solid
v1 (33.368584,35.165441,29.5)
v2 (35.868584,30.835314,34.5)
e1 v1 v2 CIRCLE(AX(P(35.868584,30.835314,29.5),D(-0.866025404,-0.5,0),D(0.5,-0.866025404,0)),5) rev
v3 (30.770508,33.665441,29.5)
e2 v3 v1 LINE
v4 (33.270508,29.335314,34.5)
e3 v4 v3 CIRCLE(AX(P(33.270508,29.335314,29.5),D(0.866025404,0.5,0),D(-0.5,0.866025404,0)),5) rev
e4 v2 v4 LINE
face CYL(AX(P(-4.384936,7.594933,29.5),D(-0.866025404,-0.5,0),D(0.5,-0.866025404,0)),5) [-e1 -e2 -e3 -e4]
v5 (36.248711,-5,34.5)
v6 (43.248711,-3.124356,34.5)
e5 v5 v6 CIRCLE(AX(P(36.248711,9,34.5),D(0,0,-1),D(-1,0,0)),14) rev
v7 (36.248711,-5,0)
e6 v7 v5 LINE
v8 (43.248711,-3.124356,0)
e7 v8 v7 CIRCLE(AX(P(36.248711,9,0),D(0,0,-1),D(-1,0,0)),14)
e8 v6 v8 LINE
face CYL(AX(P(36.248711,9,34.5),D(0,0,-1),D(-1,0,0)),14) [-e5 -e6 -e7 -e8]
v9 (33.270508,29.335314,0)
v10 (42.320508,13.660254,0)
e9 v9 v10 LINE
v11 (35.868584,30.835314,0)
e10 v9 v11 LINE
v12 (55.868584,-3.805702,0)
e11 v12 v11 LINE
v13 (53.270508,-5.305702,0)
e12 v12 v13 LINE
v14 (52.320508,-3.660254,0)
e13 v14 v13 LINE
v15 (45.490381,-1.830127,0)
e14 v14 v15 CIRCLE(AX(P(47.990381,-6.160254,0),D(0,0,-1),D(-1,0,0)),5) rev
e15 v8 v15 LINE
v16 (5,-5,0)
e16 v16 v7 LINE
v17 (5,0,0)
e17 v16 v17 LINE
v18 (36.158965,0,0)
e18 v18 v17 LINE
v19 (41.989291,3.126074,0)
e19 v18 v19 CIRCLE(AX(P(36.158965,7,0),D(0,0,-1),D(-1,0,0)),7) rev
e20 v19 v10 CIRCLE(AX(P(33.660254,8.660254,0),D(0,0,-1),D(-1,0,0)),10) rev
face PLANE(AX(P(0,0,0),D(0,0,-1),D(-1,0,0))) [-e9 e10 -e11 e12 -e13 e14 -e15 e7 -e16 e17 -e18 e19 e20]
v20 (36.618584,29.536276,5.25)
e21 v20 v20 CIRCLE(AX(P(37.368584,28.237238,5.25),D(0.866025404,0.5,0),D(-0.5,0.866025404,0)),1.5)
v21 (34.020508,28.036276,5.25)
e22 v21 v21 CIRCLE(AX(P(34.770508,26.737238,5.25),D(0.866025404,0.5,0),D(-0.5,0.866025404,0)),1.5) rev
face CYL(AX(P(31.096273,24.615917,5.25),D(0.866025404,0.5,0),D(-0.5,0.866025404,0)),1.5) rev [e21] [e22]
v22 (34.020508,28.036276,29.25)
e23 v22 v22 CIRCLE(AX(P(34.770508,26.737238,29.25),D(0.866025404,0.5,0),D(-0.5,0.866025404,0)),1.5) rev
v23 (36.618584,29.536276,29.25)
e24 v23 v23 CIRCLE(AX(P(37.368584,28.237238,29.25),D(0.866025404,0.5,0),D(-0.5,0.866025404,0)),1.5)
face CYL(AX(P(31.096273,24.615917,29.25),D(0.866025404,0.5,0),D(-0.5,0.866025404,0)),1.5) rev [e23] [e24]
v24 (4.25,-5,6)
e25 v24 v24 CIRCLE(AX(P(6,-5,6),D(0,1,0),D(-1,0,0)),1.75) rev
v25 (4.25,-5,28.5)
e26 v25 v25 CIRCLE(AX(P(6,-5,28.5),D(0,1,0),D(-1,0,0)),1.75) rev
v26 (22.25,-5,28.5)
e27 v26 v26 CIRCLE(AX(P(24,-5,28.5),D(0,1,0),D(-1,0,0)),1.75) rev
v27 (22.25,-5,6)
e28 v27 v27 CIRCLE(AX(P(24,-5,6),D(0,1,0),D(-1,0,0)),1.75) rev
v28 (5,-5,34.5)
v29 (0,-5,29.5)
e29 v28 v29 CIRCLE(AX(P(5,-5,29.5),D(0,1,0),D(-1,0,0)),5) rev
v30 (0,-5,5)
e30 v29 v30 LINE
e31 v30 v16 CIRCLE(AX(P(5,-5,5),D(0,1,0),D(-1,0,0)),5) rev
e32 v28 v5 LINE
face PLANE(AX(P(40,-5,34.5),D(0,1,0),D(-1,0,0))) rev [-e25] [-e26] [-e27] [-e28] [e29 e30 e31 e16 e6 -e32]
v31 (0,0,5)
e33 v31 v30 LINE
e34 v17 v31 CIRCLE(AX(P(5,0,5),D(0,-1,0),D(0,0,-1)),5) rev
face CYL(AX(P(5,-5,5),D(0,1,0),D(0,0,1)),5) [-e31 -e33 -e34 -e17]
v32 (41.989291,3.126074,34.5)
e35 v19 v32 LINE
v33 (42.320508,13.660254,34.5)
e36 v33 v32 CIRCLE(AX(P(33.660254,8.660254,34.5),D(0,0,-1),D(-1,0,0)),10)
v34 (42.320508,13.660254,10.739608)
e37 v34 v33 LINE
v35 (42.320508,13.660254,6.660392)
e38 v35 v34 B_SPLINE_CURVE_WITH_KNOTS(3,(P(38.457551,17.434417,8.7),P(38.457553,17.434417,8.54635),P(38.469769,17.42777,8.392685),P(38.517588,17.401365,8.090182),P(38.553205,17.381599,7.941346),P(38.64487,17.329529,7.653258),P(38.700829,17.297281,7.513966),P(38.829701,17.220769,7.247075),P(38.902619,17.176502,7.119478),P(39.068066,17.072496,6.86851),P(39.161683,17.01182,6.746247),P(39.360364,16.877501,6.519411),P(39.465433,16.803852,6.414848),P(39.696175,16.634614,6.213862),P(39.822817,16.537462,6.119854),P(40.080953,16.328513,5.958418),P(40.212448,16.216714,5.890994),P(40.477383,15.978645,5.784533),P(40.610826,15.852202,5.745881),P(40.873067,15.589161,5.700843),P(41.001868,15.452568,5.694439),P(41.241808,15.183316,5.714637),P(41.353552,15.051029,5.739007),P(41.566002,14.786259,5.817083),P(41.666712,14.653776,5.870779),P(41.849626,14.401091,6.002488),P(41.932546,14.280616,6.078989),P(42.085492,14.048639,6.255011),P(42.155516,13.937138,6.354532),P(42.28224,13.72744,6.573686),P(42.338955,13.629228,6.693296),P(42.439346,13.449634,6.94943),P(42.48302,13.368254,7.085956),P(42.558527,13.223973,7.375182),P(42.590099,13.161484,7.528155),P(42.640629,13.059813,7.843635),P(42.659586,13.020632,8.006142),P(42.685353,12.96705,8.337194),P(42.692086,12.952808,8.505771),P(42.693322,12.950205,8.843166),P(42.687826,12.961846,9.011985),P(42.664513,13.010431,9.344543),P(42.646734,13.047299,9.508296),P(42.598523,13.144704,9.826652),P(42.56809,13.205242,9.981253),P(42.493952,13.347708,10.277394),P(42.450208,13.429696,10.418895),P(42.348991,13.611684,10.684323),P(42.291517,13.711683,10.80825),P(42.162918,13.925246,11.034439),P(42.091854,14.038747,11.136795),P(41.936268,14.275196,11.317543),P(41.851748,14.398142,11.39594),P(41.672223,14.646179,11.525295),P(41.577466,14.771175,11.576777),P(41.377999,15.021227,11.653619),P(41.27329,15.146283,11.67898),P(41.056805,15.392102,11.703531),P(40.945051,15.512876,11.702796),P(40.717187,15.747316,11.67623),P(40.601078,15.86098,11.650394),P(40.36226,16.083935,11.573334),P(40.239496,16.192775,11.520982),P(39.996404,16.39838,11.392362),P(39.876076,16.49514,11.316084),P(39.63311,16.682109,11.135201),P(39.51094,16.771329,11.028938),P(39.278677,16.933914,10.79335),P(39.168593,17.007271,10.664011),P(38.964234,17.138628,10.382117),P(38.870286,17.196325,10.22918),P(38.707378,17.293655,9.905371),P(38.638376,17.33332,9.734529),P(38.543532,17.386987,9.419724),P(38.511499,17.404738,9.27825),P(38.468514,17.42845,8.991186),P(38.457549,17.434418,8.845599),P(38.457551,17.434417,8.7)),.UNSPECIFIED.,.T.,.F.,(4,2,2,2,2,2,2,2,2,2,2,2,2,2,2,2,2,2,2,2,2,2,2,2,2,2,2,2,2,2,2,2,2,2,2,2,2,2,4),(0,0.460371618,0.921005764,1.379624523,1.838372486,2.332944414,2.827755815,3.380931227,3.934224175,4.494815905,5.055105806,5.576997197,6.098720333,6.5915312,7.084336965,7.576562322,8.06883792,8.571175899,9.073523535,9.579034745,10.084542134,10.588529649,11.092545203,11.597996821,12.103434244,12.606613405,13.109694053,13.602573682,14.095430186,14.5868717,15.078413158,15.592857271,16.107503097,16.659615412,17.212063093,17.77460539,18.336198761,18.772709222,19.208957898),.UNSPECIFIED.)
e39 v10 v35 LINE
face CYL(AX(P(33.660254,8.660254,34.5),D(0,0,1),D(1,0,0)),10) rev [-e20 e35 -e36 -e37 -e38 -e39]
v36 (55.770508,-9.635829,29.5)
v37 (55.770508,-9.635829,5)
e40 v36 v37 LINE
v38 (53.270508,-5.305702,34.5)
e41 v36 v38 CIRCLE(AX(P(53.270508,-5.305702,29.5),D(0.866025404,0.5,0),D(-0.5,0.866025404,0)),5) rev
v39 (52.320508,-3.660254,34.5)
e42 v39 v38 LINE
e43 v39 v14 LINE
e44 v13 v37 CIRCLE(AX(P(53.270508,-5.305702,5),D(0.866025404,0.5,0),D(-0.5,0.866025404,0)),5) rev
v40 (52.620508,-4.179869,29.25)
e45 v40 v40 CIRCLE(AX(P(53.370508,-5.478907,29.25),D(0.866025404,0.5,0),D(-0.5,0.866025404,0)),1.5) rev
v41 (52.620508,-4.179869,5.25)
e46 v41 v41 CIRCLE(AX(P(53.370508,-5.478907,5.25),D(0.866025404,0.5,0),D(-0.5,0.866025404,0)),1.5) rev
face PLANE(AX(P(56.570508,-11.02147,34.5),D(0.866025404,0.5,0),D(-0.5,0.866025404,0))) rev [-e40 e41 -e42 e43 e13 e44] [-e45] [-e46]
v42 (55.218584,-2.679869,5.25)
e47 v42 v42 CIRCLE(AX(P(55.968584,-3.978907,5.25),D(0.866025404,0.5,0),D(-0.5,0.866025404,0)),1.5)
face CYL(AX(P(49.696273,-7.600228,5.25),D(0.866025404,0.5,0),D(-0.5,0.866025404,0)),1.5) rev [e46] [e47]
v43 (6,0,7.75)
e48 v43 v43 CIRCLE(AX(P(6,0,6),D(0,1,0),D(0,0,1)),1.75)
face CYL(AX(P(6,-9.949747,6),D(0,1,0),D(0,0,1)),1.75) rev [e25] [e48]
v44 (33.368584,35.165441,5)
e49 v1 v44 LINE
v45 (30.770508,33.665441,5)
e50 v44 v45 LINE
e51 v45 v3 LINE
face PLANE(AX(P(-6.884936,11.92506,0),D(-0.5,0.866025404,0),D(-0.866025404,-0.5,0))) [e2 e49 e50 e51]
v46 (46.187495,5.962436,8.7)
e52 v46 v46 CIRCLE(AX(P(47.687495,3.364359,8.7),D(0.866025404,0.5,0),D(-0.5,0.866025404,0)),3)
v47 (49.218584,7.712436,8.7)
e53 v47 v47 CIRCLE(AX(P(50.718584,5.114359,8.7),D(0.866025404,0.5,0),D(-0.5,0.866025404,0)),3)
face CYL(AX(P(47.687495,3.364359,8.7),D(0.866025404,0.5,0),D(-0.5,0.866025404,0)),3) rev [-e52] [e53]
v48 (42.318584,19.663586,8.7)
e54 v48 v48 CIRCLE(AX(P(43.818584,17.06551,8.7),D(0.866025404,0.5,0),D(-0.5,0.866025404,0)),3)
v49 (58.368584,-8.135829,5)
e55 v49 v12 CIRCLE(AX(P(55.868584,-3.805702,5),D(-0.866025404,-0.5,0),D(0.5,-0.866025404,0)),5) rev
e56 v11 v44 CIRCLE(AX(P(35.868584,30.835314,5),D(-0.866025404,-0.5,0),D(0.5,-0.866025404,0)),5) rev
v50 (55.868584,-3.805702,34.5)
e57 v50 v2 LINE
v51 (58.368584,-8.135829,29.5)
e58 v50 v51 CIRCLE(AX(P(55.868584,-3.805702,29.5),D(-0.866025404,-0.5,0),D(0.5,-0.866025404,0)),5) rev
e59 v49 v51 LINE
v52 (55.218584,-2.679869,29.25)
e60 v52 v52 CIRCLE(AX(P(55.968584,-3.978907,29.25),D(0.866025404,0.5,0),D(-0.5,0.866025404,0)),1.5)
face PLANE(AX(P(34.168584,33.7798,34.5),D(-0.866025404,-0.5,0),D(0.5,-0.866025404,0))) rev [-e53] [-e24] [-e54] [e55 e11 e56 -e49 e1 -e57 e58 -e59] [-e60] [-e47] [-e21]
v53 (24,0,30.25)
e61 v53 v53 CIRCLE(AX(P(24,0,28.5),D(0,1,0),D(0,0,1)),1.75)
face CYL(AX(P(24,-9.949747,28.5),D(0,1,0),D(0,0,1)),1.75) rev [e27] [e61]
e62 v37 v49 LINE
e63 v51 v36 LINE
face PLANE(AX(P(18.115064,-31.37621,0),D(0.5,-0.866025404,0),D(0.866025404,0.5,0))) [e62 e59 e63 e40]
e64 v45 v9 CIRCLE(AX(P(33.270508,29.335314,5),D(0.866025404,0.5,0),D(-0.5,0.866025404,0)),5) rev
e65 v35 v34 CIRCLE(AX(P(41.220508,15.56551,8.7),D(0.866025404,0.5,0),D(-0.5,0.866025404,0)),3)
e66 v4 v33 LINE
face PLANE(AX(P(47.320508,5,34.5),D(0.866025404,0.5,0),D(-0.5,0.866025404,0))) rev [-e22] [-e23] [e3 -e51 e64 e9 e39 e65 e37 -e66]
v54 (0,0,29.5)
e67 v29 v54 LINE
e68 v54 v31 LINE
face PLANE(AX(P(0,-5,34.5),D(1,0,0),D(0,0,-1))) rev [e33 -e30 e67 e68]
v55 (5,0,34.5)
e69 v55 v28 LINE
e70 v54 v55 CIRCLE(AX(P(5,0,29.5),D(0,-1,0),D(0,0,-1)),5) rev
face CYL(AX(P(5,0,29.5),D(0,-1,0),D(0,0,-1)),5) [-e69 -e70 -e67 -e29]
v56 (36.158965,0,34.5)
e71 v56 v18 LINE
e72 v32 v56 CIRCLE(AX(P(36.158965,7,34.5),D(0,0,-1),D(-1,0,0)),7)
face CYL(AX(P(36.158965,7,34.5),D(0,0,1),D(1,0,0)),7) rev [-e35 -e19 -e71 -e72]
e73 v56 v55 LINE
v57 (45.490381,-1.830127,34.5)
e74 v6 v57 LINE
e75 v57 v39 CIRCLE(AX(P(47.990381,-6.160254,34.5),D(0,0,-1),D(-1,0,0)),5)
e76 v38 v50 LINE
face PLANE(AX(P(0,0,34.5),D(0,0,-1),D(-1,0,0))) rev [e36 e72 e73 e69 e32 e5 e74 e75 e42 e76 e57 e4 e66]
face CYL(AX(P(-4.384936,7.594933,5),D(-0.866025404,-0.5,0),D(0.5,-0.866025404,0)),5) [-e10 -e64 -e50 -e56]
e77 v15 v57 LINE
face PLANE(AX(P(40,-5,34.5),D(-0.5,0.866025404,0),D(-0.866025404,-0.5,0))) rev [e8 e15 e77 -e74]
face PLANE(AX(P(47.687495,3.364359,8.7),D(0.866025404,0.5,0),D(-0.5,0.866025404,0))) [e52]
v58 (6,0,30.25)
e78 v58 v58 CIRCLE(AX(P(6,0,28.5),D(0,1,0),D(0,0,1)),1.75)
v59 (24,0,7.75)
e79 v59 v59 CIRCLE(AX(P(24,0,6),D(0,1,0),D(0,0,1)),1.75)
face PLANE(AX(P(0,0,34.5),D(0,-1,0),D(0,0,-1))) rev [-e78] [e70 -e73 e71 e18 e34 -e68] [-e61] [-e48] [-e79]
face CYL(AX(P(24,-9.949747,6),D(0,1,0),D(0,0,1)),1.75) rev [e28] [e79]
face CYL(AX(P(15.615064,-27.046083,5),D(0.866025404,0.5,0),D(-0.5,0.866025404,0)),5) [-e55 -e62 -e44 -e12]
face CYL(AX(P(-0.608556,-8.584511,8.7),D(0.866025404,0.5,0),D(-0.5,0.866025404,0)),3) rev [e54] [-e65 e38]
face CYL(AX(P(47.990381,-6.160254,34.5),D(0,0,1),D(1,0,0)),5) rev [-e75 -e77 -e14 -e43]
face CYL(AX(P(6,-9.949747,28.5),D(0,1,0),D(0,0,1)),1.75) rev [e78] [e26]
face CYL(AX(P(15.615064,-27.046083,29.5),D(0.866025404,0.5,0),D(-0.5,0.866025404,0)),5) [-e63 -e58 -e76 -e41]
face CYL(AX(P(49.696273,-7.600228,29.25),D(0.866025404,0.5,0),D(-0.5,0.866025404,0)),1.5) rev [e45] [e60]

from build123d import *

# Parameters (mm, degrees)
P_IDAT_VYSUNUT_M1_DEPTH       = 34.5
SKICA2_R                      = 1.5
ODEBRAT_VYSUNUT_M1_DEPTH      = 3
SKICA4_R                      = 1.75
ODEBRAT_VYSUNUT_M2_DEPTH      = 5
SKICA6_W                      = 3
SKICA6_H                      = 34.5
P_IDAT_VYSUNUT_M3_DEPTH       = 1.6
SKICA7_W                      = 3
SKICA7_H                      = 34.5
ODEBRAT_VYSUNUT_M3_DEPTH      = 1.6
ZAOBLIT1_R                    = 5
ZAOBLIT2_R                    = 5
ZAOBLIT3_R                    = 10
ZAOBLIT4_R                    = 5
ZAOBLIT5_R                    = 7
ZAOBLIT6_R                    = 14
ODEBRAT_VYSUNUT_M5_REACH      = 64.381
ODEBRAT_VYSUNUT_M5_END_RADIUS = 10
SKICA8_R                      = 3
SKICA9_R                      = 3
ODEBRAT_VYSUNUT_M6_DEPTH      = 3.5


with BuildPart() as part:
    # Skica1 → Přidat vysunutím1 (new body)
    with BuildSketch(Plane.XY):
        Polygon((0, 0), (38.660254038, 0), (47.320508076, 5), (31.570508076, 32.279800219), (34.168584287, 33.779800219), (59.168584287, -9.52146997), (56.570508076, -11.02146997), (49.820508076, 0.669872981), (40, -5), (0, -5), align=None)
    extrude(amount=P_IDAT_VYSUNUT_M1_DEPTH)

    # Skica2 → Odebrat vysunutím1 (cut)
    with BuildSketch(Plane(origin=(40.253520778, 23.240381057, 0), x_dir=(0, 0, -1), z_dir=(0.8660254037844362, 0.5000000000000046, 0))):
        with Locations(Location((-29.25, 5.769872981, 0), (0, 0, 90))):
            Circle(SKICA2_R)
        with Locations(Location((-29.25, -31.430127019, 0), (0, 0, 90))):
            Circle(SKICA2_R)
        with Locations(Location((-5.25, 5.769872981, 0), (0, 0, 90))):
            Circle(SKICA2_R)
        with Locations(Location((-5.25, -31.430127019, 0), (0, 0, 90))):
            Circle(SKICA2_R)
    extrude(amount=-ODEBRAT_VYSUNUT_M1_DEPTH, mode=Mode.SUBTRACT)

    # Skica4 → Odebrat vysunutím2 (cut)
    with BuildSketch(Plane(origin=(0, 0, 0), x_dir=(1, 0, 0), z_dir=(0, 1, 0))):
        with Locations(Location((6, -6, 0), (0, 0, 270))):
            Circle(SKICA4_R)
        with Locations(Location((6, -28.5, 0), (0, 0, 270))):
            Circle(SKICA4_R)
        with Locations(Location((24, -28.5, 0), (0, 0, 270))):
            Circle(SKICA4_R)
        with Locations(Location((24, -6, 0), (0, 0, 270))):
            Circle(SKICA4_R)
    extrude(amount=-ODEBRAT_VYSUNUT_M2_DEPTH, mode=Mode.SUBTRACT)

    # Skica6 → Přidat vysunutím3 (add)
    with BuildSketch(Plane(origin=(-6.084936491, 10.539419162, 0), x_dir=(0.8660254037844357, 0.5000000000000052, 0), z_dir=(-0.5000000000000052, 0.8660254037844357, 0))):
        with Locations((44.980762114, -17.25)):
            Rectangle(SKICA6_W, SKICA6_H)
    extrude(amount=P_IDAT_VYSUNUT_M3_DEPTH)

    # Skica7 → Odebrat vysunutím3 (cut)
    with BuildSketch(Plane(origin=(18.915063509, -32.761851027, 0), x_dir=(0.8660254037844368, 0.5000000000000032, 0), z_dir=(0.5000000000000032, -0.8660254037844368, 0))):
        with Locations((44.980762114, 17.25)):
            Rectangle(SKICA7_W, SKICA7_H)
    extrude(amount=-ODEBRAT_VYSUNUT_M3_DEPTH, mode=Mode.SUBTRACT)

    # Zaoblit1
    zaoblit1_edges = [part.edges().sort_by_distance(p)[0] for p in [
        (32.069546181, 34.415440865, 0),
        (32.069546181, 34.415440865, 34.5),
        (57.069546181, -8.885829324, 34.5),
        (57.069546181, -8.885829324, 0),
    ]]
    fillet(zaoblit1_edges, radius=ZAOBLIT1_R)

    # Zaoblit2
    zaoblit2_edges = [part.edges().sort_by_distance(p)[0] for p in [
        (0, -2.5, 0),
        (0, -2.5, 34.5),
    ]]
    fillet(zaoblit2_edges, radius=ZAOBLIT2_R)

    # Zaoblit3
    zaoblit3_edges = [part.edges().sort_by_distance(p)[0] for p in [
        (47.320508076, 5, 17.25),
    ]]
    fillet(zaoblit3_edges, radius=ZAOBLIT3_R - 0.0001)  # a hair under: the kernel refuses the full size

    # Zaoblit4
    zaoblit4_edges = [part.edges().sort_by_distance(p)[0] for p in [
        (49.820508076, 0.669872981, 17.25),
    ]]
    fillet(zaoblit4_edges, radius=ZAOBLIT4_R)

    # Zaoblit5
    zaoblit5_edges = [part.edges().sort_by_distance(p)[0] for p in [
        (38.660254038, 0, 17.25),
    ]]
    fillet(zaoblit5_edges, radius=ZAOBLIT5_R)

    # Zaoblit6
    zaoblit6_edges = [part.edges().sort_by_distance(p)[0] for p in [
        (40, -5, 17.25),
    ]]
    fillet(zaoblit6_edges, radius=ZAOBLIT6_R)

    # Odebrat vysunutím5: up to this cylinder (the profile starts outside it)
    odebrat_vysunut_m5_end = Plane(origin=(33.660254038, 8.660254038, 8.7), z_dir=(0, 0, 1)) * Cylinder(ODEBRAT_VYSUNUT_M5_END_RADIUS, 149.762, mode=Mode.PRIVATE)
    # Skica8 → Odebrat vysunutím5 (cut, up to the surface)
    with BuildSketch(Plane(origin=(40.253520778, 23.240381057, 0), x_dir=(0, 0, -1), z_dir=(0.8660254037844367, 0.5000000000000033, 0)), mode=Mode.PRIVATE) as odebrat_vysunut_m5_sk1:
        with Locations(Location((-8.7, -7.130127019, 0), (0, 0, 90))):
            Circle(SKICA8_R)
    odebrat_vysunut_m5_tool1 = extrude(odebrat_vysunut_m5_sk1.sketch, amount=-ODEBRAT_VYSUNUT_M5_REACH, mode=Mode.PRIVATE) - odebrat_vysunut_m5_end
    add(odebrat_vysunut_m5_tool1.solids().sort_by_distance((43.818584, 17.06551, 8.7))[0], mode=Mode.SUBTRACT)

    # Skica9 → Odebrat vysunutím6 (cut)
    with BuildSketch(Plane(origin=(40.253520778, 23.240381057, 0), x_dir=(0, 0, -1), z_dir=(0.8660254037844367, 0.5000000000000033, 0))):
        with Locations(Location((-8.7, -20.930127019, 0), (0, 0, 90))):
            Circle(SKICA9_R)
    extrude(amount=-ODEBRAT_VYSUNUT_M6_DEPTH, mode=Mode.SUBTRACT)


solid = part.part
